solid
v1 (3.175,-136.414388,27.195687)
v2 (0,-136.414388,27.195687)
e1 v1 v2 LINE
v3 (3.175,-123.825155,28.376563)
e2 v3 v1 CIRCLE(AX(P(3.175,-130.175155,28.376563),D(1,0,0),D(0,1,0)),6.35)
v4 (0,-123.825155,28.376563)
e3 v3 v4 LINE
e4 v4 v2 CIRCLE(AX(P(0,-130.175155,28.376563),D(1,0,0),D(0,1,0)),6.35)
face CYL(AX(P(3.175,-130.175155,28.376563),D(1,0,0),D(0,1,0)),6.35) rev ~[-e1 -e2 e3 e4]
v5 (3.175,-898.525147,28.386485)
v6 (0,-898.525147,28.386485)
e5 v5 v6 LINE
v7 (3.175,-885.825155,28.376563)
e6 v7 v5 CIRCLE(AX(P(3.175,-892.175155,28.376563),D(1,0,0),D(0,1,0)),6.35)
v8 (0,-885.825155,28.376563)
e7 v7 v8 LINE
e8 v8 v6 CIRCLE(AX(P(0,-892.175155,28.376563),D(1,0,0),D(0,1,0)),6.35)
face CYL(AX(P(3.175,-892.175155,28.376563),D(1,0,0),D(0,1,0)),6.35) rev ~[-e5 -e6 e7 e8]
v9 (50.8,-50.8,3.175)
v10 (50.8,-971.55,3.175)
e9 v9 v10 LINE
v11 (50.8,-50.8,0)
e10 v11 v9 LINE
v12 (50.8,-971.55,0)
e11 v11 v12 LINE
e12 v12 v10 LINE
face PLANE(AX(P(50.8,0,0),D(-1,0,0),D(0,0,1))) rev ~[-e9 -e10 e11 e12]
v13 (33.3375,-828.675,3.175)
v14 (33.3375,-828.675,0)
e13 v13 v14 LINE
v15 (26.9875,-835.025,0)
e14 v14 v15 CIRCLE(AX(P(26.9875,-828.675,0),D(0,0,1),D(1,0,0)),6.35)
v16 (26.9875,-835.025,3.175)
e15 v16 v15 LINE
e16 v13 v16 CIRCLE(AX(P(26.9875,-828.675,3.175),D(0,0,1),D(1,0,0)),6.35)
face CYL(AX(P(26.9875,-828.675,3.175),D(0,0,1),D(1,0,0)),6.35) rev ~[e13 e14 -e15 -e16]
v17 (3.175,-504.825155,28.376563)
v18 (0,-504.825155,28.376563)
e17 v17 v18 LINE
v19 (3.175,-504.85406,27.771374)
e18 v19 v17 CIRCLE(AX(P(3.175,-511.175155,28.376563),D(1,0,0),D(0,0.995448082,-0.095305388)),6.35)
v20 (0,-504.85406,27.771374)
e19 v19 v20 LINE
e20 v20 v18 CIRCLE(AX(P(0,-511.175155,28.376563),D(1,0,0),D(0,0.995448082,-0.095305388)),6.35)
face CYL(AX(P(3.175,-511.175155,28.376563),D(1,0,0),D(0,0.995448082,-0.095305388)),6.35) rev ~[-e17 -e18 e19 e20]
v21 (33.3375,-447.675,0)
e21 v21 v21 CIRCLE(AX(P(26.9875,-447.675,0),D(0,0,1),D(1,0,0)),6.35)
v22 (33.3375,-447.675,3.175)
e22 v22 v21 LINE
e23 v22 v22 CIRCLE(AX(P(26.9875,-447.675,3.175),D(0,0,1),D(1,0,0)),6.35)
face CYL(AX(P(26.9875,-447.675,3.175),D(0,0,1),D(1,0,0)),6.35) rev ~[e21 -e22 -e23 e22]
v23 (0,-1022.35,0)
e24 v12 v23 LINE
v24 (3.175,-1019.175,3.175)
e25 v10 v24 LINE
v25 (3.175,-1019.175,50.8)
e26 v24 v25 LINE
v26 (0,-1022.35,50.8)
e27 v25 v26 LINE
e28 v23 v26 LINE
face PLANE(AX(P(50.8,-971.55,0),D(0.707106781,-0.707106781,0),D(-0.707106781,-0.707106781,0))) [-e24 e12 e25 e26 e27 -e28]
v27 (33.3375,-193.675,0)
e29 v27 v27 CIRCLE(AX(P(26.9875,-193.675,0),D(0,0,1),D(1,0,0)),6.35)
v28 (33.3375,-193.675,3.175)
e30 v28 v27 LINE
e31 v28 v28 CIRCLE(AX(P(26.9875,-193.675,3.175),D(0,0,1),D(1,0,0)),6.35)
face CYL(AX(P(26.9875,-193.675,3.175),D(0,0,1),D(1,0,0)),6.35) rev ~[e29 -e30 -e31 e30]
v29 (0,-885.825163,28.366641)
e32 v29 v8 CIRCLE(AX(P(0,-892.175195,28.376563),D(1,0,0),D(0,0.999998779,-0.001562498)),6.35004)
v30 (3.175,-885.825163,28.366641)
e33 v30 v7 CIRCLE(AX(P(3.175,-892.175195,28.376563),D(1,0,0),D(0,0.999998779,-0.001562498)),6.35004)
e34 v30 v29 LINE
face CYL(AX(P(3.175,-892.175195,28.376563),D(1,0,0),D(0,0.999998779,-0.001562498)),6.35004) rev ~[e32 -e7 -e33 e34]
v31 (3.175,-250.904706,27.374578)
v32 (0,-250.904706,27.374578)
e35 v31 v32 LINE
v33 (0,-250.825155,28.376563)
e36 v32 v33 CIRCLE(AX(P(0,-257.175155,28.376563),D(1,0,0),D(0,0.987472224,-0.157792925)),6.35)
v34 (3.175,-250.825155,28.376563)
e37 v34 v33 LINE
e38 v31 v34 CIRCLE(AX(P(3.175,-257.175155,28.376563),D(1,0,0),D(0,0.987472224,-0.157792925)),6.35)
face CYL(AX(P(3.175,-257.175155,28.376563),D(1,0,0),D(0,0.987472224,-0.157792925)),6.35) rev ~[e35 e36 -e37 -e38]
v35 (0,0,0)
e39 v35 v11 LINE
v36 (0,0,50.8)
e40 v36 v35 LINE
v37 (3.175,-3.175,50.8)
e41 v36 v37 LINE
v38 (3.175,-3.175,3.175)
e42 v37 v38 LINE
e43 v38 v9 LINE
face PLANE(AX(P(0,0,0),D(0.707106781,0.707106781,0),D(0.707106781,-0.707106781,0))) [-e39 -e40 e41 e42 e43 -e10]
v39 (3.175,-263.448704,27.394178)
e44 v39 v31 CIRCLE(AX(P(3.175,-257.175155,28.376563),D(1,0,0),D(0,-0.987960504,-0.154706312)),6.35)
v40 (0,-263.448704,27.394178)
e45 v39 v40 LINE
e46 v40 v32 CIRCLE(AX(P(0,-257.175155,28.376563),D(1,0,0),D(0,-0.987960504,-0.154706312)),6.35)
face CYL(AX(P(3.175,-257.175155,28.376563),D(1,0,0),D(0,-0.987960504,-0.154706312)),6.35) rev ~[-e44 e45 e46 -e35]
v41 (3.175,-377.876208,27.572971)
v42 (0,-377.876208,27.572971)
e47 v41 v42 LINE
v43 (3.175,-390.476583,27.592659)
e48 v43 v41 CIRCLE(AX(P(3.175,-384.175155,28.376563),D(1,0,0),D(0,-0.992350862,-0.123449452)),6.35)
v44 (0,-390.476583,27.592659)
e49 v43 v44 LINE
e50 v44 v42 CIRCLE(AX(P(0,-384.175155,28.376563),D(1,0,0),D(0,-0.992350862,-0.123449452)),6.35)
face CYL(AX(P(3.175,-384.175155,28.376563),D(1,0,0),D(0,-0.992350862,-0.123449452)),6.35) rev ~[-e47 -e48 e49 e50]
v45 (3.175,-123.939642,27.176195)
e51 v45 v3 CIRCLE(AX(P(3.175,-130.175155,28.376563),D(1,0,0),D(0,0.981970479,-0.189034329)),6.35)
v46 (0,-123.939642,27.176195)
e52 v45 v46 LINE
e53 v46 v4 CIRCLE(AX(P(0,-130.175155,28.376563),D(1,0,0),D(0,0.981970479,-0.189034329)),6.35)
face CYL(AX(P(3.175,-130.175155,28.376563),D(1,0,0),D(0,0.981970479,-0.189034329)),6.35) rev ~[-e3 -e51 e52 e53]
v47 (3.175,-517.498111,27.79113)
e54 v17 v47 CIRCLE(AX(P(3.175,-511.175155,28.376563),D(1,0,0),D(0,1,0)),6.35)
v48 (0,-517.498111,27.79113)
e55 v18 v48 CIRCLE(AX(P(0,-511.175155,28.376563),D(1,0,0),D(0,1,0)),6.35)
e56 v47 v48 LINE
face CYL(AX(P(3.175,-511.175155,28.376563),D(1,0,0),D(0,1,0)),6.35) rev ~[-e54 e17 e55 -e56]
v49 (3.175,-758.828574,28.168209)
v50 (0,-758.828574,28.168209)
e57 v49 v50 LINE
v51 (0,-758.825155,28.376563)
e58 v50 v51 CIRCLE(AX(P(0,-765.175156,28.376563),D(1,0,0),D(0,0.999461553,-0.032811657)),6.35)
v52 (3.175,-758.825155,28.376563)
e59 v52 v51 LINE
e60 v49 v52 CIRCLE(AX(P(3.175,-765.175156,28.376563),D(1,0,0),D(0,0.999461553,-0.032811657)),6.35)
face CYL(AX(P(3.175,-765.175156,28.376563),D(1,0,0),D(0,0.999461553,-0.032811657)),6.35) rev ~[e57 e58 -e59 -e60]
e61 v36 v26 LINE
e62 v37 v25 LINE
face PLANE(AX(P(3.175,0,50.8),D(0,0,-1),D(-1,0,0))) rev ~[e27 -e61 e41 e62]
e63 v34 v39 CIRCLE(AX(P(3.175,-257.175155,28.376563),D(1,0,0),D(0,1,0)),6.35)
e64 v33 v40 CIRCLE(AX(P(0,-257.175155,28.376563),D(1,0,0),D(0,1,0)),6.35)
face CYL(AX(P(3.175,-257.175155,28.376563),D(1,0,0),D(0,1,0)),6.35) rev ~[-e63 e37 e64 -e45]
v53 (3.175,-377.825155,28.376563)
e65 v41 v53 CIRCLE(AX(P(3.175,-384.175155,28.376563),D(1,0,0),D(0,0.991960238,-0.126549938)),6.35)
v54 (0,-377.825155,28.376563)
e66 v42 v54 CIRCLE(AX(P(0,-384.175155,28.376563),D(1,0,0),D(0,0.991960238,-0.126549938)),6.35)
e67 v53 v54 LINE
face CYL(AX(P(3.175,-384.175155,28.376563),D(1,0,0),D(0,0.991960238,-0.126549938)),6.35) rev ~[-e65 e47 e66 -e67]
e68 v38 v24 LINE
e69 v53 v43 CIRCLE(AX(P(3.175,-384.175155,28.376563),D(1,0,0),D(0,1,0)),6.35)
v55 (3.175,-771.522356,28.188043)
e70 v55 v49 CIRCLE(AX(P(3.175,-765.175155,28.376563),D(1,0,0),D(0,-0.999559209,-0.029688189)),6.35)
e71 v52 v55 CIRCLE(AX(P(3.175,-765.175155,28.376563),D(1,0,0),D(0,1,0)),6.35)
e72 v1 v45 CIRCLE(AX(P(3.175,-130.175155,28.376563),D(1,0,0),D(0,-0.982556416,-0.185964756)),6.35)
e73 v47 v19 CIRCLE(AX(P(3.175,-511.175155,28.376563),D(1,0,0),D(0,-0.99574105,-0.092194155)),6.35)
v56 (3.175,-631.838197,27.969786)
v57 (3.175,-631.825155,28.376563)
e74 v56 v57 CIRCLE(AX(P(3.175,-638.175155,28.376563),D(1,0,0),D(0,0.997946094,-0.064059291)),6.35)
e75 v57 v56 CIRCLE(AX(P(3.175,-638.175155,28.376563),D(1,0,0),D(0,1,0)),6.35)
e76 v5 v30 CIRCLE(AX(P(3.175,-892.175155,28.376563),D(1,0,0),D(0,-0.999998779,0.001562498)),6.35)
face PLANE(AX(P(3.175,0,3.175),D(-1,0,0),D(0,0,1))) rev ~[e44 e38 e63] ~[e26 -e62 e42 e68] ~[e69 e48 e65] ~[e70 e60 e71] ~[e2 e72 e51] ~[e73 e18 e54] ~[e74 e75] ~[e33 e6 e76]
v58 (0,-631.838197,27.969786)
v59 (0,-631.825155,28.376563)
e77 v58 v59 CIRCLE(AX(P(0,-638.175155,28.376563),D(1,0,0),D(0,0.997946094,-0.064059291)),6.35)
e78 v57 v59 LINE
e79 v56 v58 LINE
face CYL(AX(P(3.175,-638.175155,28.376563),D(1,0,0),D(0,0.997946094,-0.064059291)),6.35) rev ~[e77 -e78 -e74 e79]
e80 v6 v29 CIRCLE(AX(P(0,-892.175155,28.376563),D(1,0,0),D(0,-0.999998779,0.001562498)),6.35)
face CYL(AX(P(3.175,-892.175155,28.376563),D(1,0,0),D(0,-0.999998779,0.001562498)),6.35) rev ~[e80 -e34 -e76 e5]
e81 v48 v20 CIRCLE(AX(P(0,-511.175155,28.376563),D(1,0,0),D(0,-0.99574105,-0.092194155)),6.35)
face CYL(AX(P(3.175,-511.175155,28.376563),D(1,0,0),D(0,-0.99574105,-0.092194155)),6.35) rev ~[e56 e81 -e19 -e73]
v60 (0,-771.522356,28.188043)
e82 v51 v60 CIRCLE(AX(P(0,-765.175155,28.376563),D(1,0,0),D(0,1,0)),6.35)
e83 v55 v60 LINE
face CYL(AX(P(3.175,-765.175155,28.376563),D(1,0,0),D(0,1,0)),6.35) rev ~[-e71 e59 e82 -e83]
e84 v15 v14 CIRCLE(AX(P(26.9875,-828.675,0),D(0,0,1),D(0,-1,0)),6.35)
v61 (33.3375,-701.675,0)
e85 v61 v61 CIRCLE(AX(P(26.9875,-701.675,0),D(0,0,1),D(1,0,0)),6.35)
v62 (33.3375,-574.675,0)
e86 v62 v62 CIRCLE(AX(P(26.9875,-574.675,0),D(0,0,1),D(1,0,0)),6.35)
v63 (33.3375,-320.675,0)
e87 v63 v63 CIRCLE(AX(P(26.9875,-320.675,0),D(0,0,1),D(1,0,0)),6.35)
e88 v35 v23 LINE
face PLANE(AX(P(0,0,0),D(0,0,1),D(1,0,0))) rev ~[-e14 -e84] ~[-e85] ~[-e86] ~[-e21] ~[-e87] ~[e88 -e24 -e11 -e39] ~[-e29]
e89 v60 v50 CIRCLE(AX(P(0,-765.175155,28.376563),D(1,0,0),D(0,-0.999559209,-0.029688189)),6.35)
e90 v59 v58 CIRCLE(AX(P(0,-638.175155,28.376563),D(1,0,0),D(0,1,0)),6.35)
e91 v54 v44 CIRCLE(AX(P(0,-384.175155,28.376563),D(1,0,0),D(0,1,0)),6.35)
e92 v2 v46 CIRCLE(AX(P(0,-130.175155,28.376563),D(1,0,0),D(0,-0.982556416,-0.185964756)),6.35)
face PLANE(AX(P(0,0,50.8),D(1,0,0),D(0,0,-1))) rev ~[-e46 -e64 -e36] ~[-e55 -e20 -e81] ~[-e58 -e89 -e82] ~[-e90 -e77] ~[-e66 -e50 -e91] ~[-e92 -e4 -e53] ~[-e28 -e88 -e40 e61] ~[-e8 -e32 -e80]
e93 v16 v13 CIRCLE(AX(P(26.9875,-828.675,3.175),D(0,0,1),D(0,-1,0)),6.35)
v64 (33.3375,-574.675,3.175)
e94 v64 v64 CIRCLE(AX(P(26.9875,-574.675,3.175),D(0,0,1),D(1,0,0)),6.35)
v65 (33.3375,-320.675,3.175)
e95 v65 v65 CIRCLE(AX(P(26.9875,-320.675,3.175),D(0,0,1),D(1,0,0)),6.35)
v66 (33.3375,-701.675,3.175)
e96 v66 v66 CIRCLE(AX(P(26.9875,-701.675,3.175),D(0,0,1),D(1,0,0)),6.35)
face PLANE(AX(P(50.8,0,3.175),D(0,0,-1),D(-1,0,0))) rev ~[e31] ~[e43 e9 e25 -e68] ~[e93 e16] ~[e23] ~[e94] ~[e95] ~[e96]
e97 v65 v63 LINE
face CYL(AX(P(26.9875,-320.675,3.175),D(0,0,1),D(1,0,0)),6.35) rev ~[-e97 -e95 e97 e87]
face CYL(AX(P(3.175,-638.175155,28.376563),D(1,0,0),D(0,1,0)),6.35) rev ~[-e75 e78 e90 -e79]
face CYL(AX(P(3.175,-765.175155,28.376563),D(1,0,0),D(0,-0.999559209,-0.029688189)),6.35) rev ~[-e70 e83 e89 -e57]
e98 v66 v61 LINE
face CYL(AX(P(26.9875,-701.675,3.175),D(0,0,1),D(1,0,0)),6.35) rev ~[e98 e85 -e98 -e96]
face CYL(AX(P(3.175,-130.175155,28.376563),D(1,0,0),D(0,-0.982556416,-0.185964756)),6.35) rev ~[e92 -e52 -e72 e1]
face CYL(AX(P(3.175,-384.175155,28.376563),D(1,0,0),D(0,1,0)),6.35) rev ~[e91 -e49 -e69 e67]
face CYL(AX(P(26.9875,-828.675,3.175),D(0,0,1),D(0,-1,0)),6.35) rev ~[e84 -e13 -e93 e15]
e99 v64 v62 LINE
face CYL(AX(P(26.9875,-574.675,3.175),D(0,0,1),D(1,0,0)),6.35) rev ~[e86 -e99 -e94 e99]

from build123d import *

# Parameters (mm, degrees)
F1_DEPTH = 1270
F3_DEPTH = 127
F5_DEPTH = 25.4
F6_R     = 6.35
F7_DEPTH = 25.4


# Not quite as in the source:
# - a feature names something its author has since deleted; it is built from what else it names


with BuildPart() as f1:
    # F0 (on Front) → F1 (new body)
    with BuildSketch(Plane.XZ):
        Polygon((3.175, 50.8), (0, 50.8), (0, 0), (50.8, 0), (50.8, 3.175), (3.175, 3.175), align=None)
    extrude(amount=F1_DEPTH)

    # F2 (on face) → F3 (intersect)
    with BuildSketch(Plane(origin=(0, 0, 0), x_dir=(1, 0, 0), z_dir=(0, 0, -1))):
        Polygon((0, 1022.35), (0, 0), (50.8, 50.8), (50.8, 971.55), align=None)
    extrude(amount=-F3_DEPTH, mode=Mode.INTERSECT)

    # F4 (on face) → F5 (cut)
    with BuildSketch(Plane.YZ.offset(3.175)):
        with BuildLine():
            ThreePointArc((-885.825155029, 28.3765627422), (-892.1701940961, 34.7265608044), (-898.5251472776, 28.3864846051))
            Line((-898.5251472776, 28.3864846051), (-885.8251627805, 28.3666408793))
            ThreePointArc((-885.8251627805, 28.3666408793), (-885.8251569669, 28.3716018093), (-885.825155029, 28.3765627422))
        make_face()
        with BuildLine():
            ThreePointArc((-123.825155029, 28.3765627422), (-130.7681849335, 34.6988104068), (-136.4143882675, 27.1956865442))
            Line((-136.4143882675, 27.1956865442), (-123.9396424845, 27.1761947539))
            ThreePointArc((-123.9396424845, 27.1761947539), (-123.8538416901, 27.7736550617), (-123.825155029, 28.3765627422))
        make_face()
        with BuildLine():
            Line((-123.9396424845, 27.1761947539), (-136.4143882675, 27.1956865442))
            ThreePointArc((-136.4143882675, 27.1956865442), (-130.1850768919, 22.0265704937), (-123.9396424845, 27.1761947539))
        make_face()
        with BuildLine():
            ThreePointArc((-250.825155029, 28.3765627422), (-257.6678327049, 34.7074211917), (-263.4487042283, 27.3941776629))
            Line((-263.4487042283, 27.3941776629), (-250.9047064081, 27.3745776663))
            ThreePointArc((-250.9047064081, 27.3745776663), (-250.8450741155, 27.8739937135), (-250.825155029, 28.3765627422))
        make_face()
        with BuildLine():
            Line((-250.9047064081, 27.3745776663), (-263.4487042283, 27.3941776629))
            ThreePointArc((-263.4487042283, 27.3941776629), (-257.1850768919, 22.0265704937), (-250.9047064081, 27.3745776663))
        make_face()
        with BuildLine():
            ThreePointArc((-377.825155029, 28.3765627422), (-384.567858719, 34.7144081026), (-390.4765830013, 27.5926587234))
            Line((-390.4765830013, 27.5926587234), (-377.8762075195, 27.5729706367))
            ThreePointArc((-377.8762075195, 27.5729706367), (-377.837931004, 27.9739566603), (-377.825155029, 28.3765627422))
        make_face()
        with BuildLine():
            Line((-377.8762075195, 27.5729706367), (-390.4765830013, 27.5926587234))
            ThreePointArc((-390.4765830013, 27.5926587234), (-384.1850768919, 22.0265704937), (-377.8762075195, 27.5729706367))
        make_face()
        with BuildLine():
            ThreePointArc((-504.825155029, 28.3765627422), (-511.4681836347, 34.7197980552), (-517.498110694, 27.7911298605))
            Line((-517.498110694, 27.7911298605), (-504.8540597111, 27.7713735308))
            ThreePointArc((-504.8540597111, 27.7713735308), (-504.8323853158, 28.0736232011), (-504.825155029, 28.3765627422))
        make_face()
        with BuildLine():
            Line((-504.8540597111, 27.7713735308), (-517.498110694, 27.7911298605))
            ThreePointArc((-517.498110694, 27.7911298605), (-511.1850768919, 22.0265704937), (-504.8540597111, 27.7713735308))
        make_face()
        with BuildLine():
            ThreePointArc((-631.825155029, 28.3765627422), (-638.3687307774, 34.7236115391), (-644.5133529596, 27.9895911765))
            Line((-644.5133529596, 27.9895911765), (-631.8381973298, 27.9697862458))
            ThreePointArc((-631.8381973298, 27.9697862458), (-631.8284164417, 28.1730699785), (-631.825155029, 28.3765627422))
        make_face()
        with BuildLine():
            Line((-631.8381973298, 27.9697862458), (-644.5133529596, 27.9895911765))
            ThreePointArc((-644.5133529596, 27.9895911765), (-638.1850768919, 22.0265704937), (-631.8381973298, 27.9697862458))
        make_face()
        with BuildLine():
            ThreePointArc((-758.825155029, 28.3765627422), (-765.2694254172, 34.7258629473), (-771.5223560035, 28.1880427438))
            Line((-771.5223560035, 28.1880427438), (-758.8285741702, 28.1682087096))
            ThreePointArc((-758.8285741702, 28.1682087096), (-758.8260098719, 28.2723716996), (-758.825155029, 28.3765627422))
        make_face()
        with BuildLine():
            Line((-758.8285741702, 28.1682087096), (-771.5223560035, 28.1880427438))
            ThreePointArc((-771.5223560035, 28.1880427438), (-765.1850768919, 22.0265704937), (-758.8285741702, 28.1682087096))
        make_face()
        with BuildLine():
            Line((-885.8251627805, 28.3666408793), (-898.5251472776, 28.3864846051))
            ThreePointArc((-898.5251472776, 28.3864846051), (-892.1850768919, 22.0265704937), (-885.8251627805, 28.3666408793))
        make_face()
    extrude(amount=-F5_DEPTH, mode=Mode.SUBTRACT)

    # F6 (on face) → F7 (cut)
    with BuildSketch(Plane.XY.offset(3.175)):
        with BuildLine():
            ThreePointArc((33.3375, -828.675), (22.4973719395, -824.1848719395), (26.9875, -835.025))
            ThreePointArc((26.9875, -835.025), (31.4776280605, -833.1651280605), (33.3375, -828.675))
        make_face()
        with Locations((26.9875, -701.675)):
            Circle(F6_R)
        with Locations((26.9875, -574.675)):
            Circle(F6_R)
        with Locations((26.9875, -447.675)):
            Circle(F6_R)
        with Locations((26.9875, -193.675)):
            Circle(F6_R)
        with Locations((26.9875, -320.675)):
            Circle(F6_R)
    extrude(amount=-F7_DEPTH, mode=Mode.SUBTRACT)


solid = f1.part
